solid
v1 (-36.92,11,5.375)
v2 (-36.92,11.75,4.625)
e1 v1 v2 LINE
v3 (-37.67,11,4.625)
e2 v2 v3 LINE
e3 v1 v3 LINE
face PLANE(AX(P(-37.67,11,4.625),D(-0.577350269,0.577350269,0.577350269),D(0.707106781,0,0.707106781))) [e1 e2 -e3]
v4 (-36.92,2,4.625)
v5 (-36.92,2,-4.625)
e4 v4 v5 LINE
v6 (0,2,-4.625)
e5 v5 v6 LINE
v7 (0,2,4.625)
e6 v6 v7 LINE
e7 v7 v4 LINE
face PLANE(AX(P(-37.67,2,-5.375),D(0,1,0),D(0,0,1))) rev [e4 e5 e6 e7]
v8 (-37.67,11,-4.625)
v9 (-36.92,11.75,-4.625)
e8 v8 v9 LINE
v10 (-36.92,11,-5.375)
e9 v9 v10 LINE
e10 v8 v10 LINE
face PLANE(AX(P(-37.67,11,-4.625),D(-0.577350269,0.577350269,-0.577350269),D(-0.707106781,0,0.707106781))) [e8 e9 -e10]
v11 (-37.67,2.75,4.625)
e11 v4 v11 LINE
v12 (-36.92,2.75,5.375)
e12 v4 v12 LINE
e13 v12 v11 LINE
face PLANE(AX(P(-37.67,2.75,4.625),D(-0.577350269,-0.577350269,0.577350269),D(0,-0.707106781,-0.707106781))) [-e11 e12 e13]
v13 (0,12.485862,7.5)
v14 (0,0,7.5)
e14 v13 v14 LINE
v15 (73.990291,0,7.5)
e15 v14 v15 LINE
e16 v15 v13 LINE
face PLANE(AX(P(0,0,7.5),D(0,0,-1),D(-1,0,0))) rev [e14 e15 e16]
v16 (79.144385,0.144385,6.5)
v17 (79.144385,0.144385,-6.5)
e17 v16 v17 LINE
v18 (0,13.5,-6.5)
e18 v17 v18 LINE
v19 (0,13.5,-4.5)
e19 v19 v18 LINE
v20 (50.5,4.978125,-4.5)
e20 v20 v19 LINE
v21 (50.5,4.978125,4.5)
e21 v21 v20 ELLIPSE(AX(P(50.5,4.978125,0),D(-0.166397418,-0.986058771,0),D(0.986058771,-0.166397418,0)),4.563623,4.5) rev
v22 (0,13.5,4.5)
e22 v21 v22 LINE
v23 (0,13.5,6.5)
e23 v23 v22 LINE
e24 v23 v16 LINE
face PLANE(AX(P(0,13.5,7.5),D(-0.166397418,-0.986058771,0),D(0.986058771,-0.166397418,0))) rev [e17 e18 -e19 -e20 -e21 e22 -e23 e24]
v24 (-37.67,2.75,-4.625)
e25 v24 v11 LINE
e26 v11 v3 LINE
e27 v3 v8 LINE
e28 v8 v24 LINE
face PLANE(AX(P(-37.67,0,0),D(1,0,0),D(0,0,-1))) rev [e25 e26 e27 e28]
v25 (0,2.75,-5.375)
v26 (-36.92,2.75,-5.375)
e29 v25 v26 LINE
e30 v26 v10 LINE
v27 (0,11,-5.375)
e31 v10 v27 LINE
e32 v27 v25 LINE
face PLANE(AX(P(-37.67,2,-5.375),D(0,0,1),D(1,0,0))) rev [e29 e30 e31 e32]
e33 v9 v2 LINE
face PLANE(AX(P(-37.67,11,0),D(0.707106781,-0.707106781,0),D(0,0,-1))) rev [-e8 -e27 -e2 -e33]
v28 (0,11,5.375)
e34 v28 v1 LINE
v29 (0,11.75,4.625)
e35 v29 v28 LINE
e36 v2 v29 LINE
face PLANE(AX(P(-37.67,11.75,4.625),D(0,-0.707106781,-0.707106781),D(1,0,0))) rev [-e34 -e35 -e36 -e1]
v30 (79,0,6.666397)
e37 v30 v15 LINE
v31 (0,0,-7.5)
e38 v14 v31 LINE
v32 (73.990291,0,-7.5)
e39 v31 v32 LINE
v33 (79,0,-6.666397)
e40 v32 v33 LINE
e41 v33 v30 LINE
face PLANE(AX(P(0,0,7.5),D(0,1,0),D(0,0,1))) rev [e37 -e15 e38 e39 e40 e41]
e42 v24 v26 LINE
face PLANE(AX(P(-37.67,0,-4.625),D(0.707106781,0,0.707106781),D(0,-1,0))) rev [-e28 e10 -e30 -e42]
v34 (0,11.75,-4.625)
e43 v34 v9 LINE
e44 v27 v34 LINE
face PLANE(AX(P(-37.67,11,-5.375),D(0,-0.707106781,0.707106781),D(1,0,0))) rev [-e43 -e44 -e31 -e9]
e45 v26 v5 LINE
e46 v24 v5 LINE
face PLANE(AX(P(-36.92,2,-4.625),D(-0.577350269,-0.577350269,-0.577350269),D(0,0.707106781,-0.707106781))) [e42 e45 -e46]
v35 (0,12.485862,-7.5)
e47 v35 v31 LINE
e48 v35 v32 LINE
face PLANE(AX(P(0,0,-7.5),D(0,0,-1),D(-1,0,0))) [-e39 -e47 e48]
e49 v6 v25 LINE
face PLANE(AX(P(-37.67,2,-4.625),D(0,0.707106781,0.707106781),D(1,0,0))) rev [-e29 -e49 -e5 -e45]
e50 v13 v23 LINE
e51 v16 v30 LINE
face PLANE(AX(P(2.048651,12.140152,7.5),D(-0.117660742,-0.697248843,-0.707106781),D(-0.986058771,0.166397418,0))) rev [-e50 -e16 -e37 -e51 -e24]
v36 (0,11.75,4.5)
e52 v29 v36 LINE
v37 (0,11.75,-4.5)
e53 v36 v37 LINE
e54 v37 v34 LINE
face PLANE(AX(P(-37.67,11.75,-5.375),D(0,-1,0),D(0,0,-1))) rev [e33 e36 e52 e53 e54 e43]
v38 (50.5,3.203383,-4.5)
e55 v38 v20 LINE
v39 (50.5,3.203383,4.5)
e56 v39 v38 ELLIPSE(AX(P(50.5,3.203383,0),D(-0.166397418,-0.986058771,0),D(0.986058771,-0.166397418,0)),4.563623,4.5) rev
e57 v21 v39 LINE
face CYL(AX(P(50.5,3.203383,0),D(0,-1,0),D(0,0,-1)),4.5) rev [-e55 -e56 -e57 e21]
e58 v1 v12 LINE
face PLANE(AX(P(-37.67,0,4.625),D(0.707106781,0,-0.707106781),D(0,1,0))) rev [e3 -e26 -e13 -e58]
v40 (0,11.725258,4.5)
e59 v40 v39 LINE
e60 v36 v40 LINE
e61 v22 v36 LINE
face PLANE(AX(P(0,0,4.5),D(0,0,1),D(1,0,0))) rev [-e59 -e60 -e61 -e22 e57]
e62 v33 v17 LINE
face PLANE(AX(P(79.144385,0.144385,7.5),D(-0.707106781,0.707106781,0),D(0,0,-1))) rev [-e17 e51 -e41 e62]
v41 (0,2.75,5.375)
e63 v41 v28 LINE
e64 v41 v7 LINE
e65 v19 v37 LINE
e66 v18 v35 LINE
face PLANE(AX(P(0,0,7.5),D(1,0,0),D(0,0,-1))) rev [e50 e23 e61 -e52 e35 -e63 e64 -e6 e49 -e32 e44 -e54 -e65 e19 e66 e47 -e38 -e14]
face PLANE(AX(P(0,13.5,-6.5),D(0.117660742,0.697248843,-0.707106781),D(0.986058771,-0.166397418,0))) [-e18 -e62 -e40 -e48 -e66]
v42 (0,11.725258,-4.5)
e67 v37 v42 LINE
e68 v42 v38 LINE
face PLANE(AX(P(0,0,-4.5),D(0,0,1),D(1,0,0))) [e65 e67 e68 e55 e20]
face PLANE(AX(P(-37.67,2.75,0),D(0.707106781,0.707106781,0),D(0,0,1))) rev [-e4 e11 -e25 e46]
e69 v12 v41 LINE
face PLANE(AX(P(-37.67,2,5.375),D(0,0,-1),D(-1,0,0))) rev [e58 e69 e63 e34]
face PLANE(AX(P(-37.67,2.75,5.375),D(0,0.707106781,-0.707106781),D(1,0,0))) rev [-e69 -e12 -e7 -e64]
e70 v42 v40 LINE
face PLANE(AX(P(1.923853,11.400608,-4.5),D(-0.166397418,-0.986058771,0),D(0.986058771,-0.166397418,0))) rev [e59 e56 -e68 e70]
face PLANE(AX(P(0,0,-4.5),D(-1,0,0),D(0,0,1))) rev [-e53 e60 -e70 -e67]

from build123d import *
from OCP.BRepFilletAPI import BRepFilletAPI_MakeChamfer

# Parameters (mm, degrees)
BOSS_EXTRUDE1_DEPTH = 7.5
SKETCH3_W           = 10.75
SKETCH3_H           = 9.75
BOSS_EXTRUDE2_DEPTH = 37.67
CUT_EXTRUDE9_START  = -3
CUT_EXTRUDE9_DEPTH  = 9
FILLET1_R           = 4.5
CHAMFER1_SIZE       = 1
CHAMFER1_SIZE2      = 0.867711944
CHAMFER3_SIZE       = 0.75


with BuildPart() as part:
    # Sketch2 → Boss-Extrude1 (new, symmetric)
    with BuildSketch(Plane.XY):
        Polygon((0, 0), (80, 0), (0, 13.5), align=None)
    extrude(amount=BOSS_EXTRUDE1_DEPTH, both=True)

    # Sketch3 → Boss-Extrude2 (add)
    with BuildSketch(Plane.ZY):
        with Locations((0, 6.875)):
            Rectangle(SKETCH3_W, SKETCH3_H)
    extrude(amount=BOSS_EXTRUDE2_DEPTH)

    # Sketch4 → Cut-Extrude9 (cut)
    with BuildSketch(Plane.XY.offset(7.5).offset(CUT_EXTRUDE9_START)):
        Polygon((55, 4.21875), (0, 13.5), (0, 11.725257914), (55, 2.444007914), align=None)
    extrude(amount=-CUT_EXTRUDE9_DEPTH, mode=Mode.SUBTRACT)

    # Fillet1
    fillet1_edges = [part.edges().sort_by_distance(p)[0] for p in [
        (55, 3.331378957, 4.5),
        (55, 3.331378957, -4.5),
    ]]
    fillet(fillet1_edges, radius=FILLET1_R - 0.0001)  # a hair under: the kernel refuses the full size

    # Chamfer1: one chamfer whose edges measure the first distance from different faces: ONE call of the kernel's chamfer builder (chamfer() names one face for all edges)
    chamfer1_edges_1 = [part.edges().sort_by_distance(p)[0] for p in [
        (40, 6.75, 7.5),
        (40, 6.75, -7.5),
    ]]
    chamfer1_edges_2 = [part.edges().sort_by_distance(p)[0] for p in [
        (80, 0, 0),
    ]]
    chamfer1_side_2 = [part.faces().sort_by_distance(p)[0] for p in [
        (40, 0, 0),
    ]]
    chamfer1 = BRepFilletAPI_MakeChamfer(part.part.solid().wrapped)
    for e in chamfer1_edges_1:
        chamfer1.Add(CHAMFER1_SIZE, e.wrapped)
    for e in chamfer1_edges_2:
        chamfer1.Add(CHAMFER1_SIZE, CHAMFER1_SIZE2, e.wrapped, chamfer1_side_2[0].wrapped)  # the first distance lies on this face
    add(Compound.cast(chamfer1.Shape()), mode=Mode.REPLACE)

    # Chamfer3
    chamfer3_edges = [part.edges().sort_by_distance(p)[0] for p in [
        (-18.835, 11.75, -5.375),
        (-18.835, 2, -5.375),
        (-18.835, 2, 5.375),
        (-18.835, 11.75, 5.375),
        (-37.67, 6.875, -5.375),
        (-37.67, 2, 0),
        (-37.67, 6.875, 5.375),
        (-37.67, 11.75, 0),
    ]]
    chamfer(chamfer3_edges, length=CHAMFER3_SIZE)


solid = part.part
